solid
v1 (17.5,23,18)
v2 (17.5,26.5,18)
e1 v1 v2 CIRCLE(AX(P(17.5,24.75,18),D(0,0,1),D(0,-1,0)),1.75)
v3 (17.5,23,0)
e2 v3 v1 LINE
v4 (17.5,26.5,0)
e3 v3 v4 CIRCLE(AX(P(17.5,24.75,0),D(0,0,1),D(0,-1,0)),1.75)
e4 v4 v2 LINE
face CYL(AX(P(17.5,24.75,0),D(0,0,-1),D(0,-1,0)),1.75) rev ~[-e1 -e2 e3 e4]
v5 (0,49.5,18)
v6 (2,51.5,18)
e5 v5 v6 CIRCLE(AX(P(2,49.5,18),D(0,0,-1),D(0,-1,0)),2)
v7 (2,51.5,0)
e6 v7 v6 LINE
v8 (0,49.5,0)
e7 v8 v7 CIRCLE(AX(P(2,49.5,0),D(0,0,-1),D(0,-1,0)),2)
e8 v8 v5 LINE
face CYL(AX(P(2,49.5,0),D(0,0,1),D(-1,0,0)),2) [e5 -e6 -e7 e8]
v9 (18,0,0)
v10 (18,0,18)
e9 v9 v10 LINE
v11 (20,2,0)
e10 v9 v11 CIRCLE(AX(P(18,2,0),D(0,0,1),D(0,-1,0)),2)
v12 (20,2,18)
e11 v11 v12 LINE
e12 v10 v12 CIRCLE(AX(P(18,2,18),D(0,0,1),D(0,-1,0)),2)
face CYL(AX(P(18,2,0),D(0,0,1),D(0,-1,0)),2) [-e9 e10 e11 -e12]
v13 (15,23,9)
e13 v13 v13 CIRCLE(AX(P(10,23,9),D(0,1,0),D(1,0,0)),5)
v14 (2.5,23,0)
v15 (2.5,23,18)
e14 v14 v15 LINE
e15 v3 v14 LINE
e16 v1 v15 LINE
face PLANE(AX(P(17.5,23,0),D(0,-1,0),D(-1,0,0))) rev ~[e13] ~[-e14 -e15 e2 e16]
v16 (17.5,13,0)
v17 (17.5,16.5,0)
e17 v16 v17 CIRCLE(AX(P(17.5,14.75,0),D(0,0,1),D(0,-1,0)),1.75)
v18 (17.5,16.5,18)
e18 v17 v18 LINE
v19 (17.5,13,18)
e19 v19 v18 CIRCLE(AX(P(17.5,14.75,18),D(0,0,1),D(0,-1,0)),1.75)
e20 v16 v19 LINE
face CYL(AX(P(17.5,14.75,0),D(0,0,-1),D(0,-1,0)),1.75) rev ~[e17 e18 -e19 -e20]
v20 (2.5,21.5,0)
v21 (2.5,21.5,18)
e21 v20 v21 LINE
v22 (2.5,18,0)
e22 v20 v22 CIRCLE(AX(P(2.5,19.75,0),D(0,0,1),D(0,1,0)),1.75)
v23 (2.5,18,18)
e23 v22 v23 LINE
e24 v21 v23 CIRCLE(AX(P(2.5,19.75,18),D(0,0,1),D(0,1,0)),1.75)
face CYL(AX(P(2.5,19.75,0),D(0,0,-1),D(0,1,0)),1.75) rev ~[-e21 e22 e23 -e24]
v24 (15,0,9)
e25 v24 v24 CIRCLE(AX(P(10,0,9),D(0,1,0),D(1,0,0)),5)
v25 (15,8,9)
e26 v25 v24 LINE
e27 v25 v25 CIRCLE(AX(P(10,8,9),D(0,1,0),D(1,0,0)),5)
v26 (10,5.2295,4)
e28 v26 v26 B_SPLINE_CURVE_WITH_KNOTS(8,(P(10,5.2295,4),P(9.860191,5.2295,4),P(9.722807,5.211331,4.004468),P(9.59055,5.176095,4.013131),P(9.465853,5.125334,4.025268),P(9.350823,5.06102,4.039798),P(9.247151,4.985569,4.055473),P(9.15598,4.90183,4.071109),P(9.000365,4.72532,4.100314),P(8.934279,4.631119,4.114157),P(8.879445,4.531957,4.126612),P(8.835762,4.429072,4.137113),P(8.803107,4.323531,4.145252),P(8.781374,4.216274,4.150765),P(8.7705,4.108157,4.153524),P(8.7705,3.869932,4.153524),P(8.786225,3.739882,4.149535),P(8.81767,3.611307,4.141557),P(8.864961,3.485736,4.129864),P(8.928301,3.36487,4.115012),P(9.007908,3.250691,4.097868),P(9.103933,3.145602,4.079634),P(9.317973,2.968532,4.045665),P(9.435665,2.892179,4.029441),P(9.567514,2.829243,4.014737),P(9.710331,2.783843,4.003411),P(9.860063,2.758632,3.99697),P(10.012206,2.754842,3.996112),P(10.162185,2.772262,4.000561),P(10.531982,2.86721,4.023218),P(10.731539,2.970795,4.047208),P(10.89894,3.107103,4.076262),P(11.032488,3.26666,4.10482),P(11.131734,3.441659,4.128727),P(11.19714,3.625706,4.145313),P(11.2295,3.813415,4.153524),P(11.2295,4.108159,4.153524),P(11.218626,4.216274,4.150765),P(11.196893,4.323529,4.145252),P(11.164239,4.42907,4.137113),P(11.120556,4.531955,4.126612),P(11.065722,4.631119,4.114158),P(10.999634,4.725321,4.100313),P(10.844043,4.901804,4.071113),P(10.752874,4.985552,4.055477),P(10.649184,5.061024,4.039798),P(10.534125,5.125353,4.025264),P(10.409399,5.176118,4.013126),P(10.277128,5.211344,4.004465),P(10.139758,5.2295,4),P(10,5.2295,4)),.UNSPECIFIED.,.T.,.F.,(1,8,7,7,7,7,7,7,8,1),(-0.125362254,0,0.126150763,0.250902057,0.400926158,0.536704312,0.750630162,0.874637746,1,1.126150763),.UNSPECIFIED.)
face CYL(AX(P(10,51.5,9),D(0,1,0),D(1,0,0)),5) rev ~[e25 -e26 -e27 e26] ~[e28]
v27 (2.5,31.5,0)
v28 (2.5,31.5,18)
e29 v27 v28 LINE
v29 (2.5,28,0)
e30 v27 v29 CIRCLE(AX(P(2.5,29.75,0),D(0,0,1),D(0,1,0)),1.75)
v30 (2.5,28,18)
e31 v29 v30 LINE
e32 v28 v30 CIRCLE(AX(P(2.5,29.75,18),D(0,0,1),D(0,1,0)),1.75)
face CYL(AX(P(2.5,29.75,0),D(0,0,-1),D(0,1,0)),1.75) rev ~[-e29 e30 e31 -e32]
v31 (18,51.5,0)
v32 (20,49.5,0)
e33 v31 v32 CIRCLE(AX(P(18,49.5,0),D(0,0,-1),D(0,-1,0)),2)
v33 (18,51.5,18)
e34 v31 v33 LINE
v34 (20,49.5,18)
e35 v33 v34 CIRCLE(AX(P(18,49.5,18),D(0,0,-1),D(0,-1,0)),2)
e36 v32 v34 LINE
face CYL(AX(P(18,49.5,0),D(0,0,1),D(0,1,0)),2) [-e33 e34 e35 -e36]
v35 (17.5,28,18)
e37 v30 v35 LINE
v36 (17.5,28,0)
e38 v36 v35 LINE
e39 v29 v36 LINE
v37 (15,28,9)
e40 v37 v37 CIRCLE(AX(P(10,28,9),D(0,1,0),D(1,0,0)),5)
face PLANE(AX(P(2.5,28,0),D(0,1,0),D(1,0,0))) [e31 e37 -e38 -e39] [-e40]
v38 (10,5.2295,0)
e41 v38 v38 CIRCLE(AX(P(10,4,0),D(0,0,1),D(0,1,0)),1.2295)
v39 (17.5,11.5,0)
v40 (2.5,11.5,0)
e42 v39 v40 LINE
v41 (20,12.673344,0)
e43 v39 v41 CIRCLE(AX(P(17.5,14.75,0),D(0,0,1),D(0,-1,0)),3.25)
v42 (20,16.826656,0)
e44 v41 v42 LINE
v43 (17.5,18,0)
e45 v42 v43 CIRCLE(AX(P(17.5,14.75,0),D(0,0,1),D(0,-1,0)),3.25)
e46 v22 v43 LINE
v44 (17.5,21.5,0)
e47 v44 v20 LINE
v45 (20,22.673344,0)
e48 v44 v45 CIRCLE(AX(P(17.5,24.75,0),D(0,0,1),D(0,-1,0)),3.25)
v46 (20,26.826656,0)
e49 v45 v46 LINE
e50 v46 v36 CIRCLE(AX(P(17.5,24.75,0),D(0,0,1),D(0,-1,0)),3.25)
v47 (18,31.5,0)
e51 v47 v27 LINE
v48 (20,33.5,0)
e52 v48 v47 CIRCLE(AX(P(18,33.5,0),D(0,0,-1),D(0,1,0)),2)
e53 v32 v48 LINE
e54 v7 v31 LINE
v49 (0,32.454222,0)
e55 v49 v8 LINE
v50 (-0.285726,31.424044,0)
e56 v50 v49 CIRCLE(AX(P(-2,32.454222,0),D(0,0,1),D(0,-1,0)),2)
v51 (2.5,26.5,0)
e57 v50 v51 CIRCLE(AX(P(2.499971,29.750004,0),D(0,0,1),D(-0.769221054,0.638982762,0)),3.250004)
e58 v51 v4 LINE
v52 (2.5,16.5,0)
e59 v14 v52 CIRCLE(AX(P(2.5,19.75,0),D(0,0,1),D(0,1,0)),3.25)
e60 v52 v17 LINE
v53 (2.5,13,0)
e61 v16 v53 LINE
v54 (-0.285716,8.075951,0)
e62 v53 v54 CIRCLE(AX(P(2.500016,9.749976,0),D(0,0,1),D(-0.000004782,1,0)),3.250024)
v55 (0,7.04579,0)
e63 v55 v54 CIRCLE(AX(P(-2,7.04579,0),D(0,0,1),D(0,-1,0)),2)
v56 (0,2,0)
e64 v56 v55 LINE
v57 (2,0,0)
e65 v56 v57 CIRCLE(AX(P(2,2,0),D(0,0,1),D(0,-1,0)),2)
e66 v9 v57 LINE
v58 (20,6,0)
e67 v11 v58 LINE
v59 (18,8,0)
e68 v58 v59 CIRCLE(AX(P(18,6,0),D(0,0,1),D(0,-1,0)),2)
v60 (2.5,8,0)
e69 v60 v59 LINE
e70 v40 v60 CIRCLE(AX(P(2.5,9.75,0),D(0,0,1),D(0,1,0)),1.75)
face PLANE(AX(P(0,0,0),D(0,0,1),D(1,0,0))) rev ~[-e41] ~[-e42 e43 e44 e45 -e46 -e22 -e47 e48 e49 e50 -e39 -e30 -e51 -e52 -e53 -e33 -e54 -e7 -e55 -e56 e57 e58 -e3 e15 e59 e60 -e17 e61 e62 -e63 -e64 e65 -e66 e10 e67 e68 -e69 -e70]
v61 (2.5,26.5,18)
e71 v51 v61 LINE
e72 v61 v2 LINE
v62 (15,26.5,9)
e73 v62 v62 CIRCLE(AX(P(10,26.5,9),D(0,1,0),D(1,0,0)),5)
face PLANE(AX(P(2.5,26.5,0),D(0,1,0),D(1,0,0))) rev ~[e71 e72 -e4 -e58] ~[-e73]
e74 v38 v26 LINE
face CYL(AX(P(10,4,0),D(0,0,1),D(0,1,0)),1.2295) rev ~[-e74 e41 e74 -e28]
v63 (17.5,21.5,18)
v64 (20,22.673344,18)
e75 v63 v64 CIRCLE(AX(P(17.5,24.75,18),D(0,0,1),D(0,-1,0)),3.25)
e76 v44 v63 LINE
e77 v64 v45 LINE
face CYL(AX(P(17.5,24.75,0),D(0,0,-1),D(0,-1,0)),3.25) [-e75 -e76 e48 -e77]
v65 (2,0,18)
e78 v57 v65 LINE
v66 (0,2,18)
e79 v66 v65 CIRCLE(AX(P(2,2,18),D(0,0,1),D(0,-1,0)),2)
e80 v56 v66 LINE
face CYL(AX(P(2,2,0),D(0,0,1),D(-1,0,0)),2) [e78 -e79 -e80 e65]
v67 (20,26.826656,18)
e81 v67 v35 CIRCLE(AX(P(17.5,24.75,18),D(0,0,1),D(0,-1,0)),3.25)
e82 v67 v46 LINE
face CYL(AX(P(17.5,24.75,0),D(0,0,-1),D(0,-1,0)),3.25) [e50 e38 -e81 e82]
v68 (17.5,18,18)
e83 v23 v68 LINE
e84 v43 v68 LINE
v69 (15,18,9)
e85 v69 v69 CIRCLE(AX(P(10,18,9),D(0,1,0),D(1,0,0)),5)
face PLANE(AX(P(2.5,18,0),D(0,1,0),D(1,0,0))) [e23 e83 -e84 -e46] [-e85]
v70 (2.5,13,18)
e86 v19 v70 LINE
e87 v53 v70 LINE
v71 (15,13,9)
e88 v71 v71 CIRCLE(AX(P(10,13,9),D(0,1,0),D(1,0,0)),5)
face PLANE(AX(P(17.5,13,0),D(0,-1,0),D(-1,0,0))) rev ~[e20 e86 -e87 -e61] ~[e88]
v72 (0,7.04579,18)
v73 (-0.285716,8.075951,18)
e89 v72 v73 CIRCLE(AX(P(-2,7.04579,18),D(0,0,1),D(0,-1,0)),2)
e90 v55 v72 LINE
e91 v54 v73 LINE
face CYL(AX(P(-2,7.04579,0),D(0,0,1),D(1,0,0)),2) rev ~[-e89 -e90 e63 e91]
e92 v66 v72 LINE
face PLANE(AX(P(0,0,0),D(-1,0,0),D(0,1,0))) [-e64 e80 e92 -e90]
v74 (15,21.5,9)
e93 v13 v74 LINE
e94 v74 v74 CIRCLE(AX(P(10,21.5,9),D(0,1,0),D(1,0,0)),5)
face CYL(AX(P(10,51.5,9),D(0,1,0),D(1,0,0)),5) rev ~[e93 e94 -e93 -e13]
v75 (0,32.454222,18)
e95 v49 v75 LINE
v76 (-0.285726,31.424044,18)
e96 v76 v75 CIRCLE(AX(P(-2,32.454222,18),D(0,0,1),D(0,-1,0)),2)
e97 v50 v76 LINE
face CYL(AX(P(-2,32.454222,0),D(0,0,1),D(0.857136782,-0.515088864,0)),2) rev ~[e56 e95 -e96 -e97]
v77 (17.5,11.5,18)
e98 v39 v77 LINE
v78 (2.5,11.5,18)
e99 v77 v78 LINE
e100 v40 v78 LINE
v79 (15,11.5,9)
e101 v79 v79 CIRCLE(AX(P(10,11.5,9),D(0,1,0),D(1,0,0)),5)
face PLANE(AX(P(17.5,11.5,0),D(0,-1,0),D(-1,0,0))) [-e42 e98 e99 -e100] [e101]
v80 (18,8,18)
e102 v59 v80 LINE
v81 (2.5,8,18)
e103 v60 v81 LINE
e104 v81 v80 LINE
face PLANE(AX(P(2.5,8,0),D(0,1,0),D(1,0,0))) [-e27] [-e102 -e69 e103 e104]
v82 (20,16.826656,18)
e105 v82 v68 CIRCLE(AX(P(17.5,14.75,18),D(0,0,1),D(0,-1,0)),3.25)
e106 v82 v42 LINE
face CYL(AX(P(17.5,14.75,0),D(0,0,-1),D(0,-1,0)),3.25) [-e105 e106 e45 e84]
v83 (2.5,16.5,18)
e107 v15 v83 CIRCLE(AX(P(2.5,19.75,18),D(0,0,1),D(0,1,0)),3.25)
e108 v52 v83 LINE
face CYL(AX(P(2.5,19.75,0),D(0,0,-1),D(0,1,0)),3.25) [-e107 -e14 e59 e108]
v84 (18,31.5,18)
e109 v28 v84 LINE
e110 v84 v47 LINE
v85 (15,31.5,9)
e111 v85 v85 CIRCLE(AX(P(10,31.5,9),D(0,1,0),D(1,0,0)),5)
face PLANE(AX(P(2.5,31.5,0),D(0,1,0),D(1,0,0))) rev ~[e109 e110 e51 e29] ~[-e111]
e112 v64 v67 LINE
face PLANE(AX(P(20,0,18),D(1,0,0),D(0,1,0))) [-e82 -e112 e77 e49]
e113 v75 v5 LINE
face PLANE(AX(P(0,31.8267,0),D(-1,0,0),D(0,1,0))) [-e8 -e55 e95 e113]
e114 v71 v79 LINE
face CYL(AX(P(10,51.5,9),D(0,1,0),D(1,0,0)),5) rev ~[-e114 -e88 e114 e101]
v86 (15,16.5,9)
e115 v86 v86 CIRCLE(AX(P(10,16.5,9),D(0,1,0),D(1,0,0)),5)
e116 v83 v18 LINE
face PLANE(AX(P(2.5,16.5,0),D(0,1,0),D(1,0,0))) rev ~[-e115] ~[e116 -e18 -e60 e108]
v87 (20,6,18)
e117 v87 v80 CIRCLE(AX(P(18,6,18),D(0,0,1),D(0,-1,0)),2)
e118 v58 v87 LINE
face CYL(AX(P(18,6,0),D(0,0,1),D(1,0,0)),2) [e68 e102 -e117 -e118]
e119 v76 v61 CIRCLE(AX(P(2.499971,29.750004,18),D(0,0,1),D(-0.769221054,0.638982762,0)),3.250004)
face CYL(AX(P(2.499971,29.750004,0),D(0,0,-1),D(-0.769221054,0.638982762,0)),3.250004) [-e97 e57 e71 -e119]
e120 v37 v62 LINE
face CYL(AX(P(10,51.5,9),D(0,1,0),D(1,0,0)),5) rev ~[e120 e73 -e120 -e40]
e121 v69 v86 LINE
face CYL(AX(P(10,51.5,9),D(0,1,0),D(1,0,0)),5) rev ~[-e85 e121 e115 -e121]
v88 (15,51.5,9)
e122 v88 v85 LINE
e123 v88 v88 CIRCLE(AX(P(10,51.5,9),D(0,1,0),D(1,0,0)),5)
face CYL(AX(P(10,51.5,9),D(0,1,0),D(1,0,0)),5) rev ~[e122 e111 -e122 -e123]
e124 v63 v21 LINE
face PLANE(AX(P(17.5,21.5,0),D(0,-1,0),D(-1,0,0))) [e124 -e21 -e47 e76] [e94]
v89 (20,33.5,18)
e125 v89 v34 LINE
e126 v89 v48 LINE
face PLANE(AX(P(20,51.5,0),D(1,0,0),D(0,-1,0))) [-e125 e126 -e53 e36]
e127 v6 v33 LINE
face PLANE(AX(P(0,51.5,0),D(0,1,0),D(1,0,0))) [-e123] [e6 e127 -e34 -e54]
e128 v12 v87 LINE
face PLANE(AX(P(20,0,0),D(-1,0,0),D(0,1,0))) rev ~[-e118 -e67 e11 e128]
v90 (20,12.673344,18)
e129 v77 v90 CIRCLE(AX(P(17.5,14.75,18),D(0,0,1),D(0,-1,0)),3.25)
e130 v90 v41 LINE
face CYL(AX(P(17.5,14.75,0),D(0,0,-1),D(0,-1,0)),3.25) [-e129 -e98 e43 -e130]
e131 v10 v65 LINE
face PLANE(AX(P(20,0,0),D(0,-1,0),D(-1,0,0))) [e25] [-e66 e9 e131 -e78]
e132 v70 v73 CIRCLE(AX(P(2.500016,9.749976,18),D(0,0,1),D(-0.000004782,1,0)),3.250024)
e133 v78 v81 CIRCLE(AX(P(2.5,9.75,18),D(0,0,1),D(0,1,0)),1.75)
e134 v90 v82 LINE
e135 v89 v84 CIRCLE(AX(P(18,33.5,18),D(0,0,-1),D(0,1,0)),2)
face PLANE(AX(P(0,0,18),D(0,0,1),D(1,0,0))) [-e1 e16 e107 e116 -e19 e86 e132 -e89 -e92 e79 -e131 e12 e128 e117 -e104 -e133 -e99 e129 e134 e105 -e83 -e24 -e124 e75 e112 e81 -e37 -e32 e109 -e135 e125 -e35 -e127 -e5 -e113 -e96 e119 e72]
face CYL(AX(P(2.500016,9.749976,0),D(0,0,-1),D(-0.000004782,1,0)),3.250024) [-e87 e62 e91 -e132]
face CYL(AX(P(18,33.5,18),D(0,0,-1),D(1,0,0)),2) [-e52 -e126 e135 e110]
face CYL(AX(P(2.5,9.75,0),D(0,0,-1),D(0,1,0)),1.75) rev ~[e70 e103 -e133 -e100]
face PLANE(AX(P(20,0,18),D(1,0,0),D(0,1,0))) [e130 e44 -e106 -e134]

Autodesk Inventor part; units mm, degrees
ref_plane "YZ Plane" through (0, 0, 0) normal (1, 0, 0) x (0, 1, 0)
ref_plane "XZ Plane" through (0, 0, 0) normal (0, 1, 0) x (-1, 0, 0)
ref_plane "XY Plane" through (0, 0, 0) normal (0, 0, 1) x (1, 0, 0)
sketch "Skizze3" plane through (0, 0, 0) normal (0, 0, 1) x (1, 0, 0)
  line L0 (0, 0) -> (0, 8)
  line L1 (0, 8) -> (20, 8)
  line L2 (20, 0) -> (0, 0)
  arc A0 (2.5, 22.25) -> (2.5, 17.25) centre (2.5, 19.75) ccw construction
  arc A1 (17.5, 12.25) -> (17.5, 17.25) centre (17.5, 14.75) ccw construction
  line L3 (17.5, 17.25) -> (2.5, 17.25) construction
  line L4 (2.5, 22.25) -> (17.5, 22.25) construction
  arc A2 (17.5, 22.25) -> (17.5, 27.25) centre (17.5, 24.75) ccw construction
  arc A3 (4.4592, 31.3029) -> (2.5, 27.25) centre (2.5, 29.75) ccw construction
  line L5 (17.5, 27.25) -> (2.5, 27.25) construction
  line L6 (2.5, 12.25) -> (17.5, 12.25) construction
  arc A4 (2.5, 12.25) -> (0.7146, 8) centre (2.5, 9.75) ccw construction
  line L7 (0, 31.5) -> (0, 51.5)
  line L8 (0, 51.5) -> (20, 51.5)
  arc A5 (0, 31.8267) -> (2.5, 26.5) centre (2.5, 29.75) ccw
  line L9 (2.5, 26.5) -> (17.5, 26.5)
  arc A6 (17.5, 23) -> (17.5, 26.5) centre (17.5, 24.75) ccw
  line L10 (17.5, 23) -> (2.5, 23)
  arc A7 (2.5, 23) -> (2.5, 16.5) centre (2.5, 19.75) ccw
  line L11 (2.5, 16.5) -> (17.5, 16.5)
  arc A8 (17.5, 13) -> (17.5, 16.5) centre (17.5, 14.75) ccw
  line L12 (17.5, 13) -> (2.5, 13)
  arc A9 (2.5, 13) -> (0, 7.6733) centre (2.5, 9.75) ccw
  arc A10 (2.5, 31.5) -> (2.5, 28) centre (2.5, 29.75) ccw
  line L13 (2.5, 28) -> (17.5, 28)
  arc A11 (17.5, 21.5) -> (17.5, 28) centre (17.5, 24.75) ccw
  line L14 (17.5, 21.5) -> (2.5, 21.5)
  arc A12 (2.5, 21.5) -> (2.5, 18) centre (2.5, 19.75) ccw
  line L15 (2.5, 18) -> (17.5, 18)
  arc A13 (17.5, 11.5) -> (17.5, 18) centre (17.5, 14.75) ccw
  line L16 (17.5, 11.5) -> (2.5, 11.5)
  arc A14 (2.5, 11.5) -> (2.5, 8) centre (2.5, 9.75) ccw
  line L17 (0, 31.5) -> (20, 31.5)
  line L18 (20, 31.5) -> (20, 31.5)
  line L19 (20, 31.5) -> (20, 41.5)
  line L20 (20, 51.5) -> (20, 41.5)
  line L21 (20, 31.5) -> (45, 31.5)
  line L22 (45, 31.5) -> (45, 41.5)
  line L23 (45, 41.5) -> (20, 41.5)
  line L24 (20, 0) -> (20, 8)
  point P0 (10, 4)
  point P1 (0, 4)
  point P2 (10, 0)
  dimension "d4" = 8
  dimension "d11" = 5
  dimension "d12" = 5
  dimension "d13" = 5
  dimension "d14" = 5
  dimension "d17" = 5
  dimension "d19" = 0.75
  dimension "d20" = 0.75
  dimension "d22" = 20
  dimension "d23" = 20
  dimension "d24" = 10
  dimension "d29" = 25
  dimension "d54" = 20
extrude "Extrusion3" add sketch "Skizze3" along normal blind 18
sketch "Skizze4" plane through (20, 31.5, 0) normal (0, 1, 0) x (1, 0, 0)
  circle A0 centre (16, -9) radius 2
  line L0 (25, 0) -> (25, -18) projected
  line L1 (25, -18) -> (0, -18) projected
  line L2 (25, 0) -> (0, 0) projected
  circle A1 centre (6, -9) radius 2.5
  line L3 (0, 0) -> (0, -18) projected
  arc A2 (16, -18) -> (16, 0) centre (16, -9) ccw
  line L4 (0, -18) -> (25, -18) projected
  arc A3 (16, 0) -> (16, -18) centre (16, -9) ccw construction
  circle A4 centre (6, -9) radius 5.25
  point P0 (25, -9)
  point P1 (25, -9)
  point P2 (21, -1.5167)
  dimension "d31" = 4
  dimension "d36" = 5
  dimension "d37" = 6
  dimension "d38" = 10
  dimension "d57" = 10.5
sketch "Skizze6" plane through (0, 51.5, 0) normal (0, 1, 0) x (1, 0, 0)
  circle A0 centre (10, -9) radius 5
  line L0 (20, -18) -> (0, -18) projected
  line L1 (0, 0) -> (0, -18) projected
  point P0 (10, -18)
  point P1 (0, -9)
  dimension "d51" = 10
extrude "Extrusion9" cut sketch "Skizze6" against normal through all
extrude "Extrusion6" cut sketch "Skizze4" along normal blind 18 contours L0 A2 L2 | L0 L1 A2 | A1
extrude "Extrusion7" add sketch "Skizze4" against normal blind 10 contours A0
hole "Bohrung1" at (10, 4, 0) direction (0, 0, 1) diameter 2.459 end up to surface thread size "M3x0.5" class "6H" standard "ISO Metric profile"
fillet "Rundung3" radius 2 8 edges at (0, 51.5, 9) (20, 51.5, 9) (20, 41.5, 9) (20, 0, 9) (20, 8, 9) (0, 0, 9) (0, 7.6733, 9) (0, 31.8267, 9)
sketch "Skizze7" plane through (0, 0, 18) normal (0, 0, 1) x (1, 0, 0)
  line L0 (20, 43.5) -> (20, 49.5) projected
  line L1 (20, 43.5) -> (50, 43.5)
  line L2 (50, 43.5) -> (50, 0)
  line L3 (50, 0) -> (20, 0)
  line L4 (20, 0) -> (20, 43.5)
  line L5 (2, 0) -> (18, 0) projected
  point P0 (0, 0)
  point P1 (35, 0)
  dimension "d68" = 30
extrude "Extrusion11" cut sketch "Skizze7" against normal through all
fillet "Rundung4" radius 2 1 edges at (20, 31.5, 9)
equation "\"d12\" = d11"
properties part number "BT505_trajan20_22"
